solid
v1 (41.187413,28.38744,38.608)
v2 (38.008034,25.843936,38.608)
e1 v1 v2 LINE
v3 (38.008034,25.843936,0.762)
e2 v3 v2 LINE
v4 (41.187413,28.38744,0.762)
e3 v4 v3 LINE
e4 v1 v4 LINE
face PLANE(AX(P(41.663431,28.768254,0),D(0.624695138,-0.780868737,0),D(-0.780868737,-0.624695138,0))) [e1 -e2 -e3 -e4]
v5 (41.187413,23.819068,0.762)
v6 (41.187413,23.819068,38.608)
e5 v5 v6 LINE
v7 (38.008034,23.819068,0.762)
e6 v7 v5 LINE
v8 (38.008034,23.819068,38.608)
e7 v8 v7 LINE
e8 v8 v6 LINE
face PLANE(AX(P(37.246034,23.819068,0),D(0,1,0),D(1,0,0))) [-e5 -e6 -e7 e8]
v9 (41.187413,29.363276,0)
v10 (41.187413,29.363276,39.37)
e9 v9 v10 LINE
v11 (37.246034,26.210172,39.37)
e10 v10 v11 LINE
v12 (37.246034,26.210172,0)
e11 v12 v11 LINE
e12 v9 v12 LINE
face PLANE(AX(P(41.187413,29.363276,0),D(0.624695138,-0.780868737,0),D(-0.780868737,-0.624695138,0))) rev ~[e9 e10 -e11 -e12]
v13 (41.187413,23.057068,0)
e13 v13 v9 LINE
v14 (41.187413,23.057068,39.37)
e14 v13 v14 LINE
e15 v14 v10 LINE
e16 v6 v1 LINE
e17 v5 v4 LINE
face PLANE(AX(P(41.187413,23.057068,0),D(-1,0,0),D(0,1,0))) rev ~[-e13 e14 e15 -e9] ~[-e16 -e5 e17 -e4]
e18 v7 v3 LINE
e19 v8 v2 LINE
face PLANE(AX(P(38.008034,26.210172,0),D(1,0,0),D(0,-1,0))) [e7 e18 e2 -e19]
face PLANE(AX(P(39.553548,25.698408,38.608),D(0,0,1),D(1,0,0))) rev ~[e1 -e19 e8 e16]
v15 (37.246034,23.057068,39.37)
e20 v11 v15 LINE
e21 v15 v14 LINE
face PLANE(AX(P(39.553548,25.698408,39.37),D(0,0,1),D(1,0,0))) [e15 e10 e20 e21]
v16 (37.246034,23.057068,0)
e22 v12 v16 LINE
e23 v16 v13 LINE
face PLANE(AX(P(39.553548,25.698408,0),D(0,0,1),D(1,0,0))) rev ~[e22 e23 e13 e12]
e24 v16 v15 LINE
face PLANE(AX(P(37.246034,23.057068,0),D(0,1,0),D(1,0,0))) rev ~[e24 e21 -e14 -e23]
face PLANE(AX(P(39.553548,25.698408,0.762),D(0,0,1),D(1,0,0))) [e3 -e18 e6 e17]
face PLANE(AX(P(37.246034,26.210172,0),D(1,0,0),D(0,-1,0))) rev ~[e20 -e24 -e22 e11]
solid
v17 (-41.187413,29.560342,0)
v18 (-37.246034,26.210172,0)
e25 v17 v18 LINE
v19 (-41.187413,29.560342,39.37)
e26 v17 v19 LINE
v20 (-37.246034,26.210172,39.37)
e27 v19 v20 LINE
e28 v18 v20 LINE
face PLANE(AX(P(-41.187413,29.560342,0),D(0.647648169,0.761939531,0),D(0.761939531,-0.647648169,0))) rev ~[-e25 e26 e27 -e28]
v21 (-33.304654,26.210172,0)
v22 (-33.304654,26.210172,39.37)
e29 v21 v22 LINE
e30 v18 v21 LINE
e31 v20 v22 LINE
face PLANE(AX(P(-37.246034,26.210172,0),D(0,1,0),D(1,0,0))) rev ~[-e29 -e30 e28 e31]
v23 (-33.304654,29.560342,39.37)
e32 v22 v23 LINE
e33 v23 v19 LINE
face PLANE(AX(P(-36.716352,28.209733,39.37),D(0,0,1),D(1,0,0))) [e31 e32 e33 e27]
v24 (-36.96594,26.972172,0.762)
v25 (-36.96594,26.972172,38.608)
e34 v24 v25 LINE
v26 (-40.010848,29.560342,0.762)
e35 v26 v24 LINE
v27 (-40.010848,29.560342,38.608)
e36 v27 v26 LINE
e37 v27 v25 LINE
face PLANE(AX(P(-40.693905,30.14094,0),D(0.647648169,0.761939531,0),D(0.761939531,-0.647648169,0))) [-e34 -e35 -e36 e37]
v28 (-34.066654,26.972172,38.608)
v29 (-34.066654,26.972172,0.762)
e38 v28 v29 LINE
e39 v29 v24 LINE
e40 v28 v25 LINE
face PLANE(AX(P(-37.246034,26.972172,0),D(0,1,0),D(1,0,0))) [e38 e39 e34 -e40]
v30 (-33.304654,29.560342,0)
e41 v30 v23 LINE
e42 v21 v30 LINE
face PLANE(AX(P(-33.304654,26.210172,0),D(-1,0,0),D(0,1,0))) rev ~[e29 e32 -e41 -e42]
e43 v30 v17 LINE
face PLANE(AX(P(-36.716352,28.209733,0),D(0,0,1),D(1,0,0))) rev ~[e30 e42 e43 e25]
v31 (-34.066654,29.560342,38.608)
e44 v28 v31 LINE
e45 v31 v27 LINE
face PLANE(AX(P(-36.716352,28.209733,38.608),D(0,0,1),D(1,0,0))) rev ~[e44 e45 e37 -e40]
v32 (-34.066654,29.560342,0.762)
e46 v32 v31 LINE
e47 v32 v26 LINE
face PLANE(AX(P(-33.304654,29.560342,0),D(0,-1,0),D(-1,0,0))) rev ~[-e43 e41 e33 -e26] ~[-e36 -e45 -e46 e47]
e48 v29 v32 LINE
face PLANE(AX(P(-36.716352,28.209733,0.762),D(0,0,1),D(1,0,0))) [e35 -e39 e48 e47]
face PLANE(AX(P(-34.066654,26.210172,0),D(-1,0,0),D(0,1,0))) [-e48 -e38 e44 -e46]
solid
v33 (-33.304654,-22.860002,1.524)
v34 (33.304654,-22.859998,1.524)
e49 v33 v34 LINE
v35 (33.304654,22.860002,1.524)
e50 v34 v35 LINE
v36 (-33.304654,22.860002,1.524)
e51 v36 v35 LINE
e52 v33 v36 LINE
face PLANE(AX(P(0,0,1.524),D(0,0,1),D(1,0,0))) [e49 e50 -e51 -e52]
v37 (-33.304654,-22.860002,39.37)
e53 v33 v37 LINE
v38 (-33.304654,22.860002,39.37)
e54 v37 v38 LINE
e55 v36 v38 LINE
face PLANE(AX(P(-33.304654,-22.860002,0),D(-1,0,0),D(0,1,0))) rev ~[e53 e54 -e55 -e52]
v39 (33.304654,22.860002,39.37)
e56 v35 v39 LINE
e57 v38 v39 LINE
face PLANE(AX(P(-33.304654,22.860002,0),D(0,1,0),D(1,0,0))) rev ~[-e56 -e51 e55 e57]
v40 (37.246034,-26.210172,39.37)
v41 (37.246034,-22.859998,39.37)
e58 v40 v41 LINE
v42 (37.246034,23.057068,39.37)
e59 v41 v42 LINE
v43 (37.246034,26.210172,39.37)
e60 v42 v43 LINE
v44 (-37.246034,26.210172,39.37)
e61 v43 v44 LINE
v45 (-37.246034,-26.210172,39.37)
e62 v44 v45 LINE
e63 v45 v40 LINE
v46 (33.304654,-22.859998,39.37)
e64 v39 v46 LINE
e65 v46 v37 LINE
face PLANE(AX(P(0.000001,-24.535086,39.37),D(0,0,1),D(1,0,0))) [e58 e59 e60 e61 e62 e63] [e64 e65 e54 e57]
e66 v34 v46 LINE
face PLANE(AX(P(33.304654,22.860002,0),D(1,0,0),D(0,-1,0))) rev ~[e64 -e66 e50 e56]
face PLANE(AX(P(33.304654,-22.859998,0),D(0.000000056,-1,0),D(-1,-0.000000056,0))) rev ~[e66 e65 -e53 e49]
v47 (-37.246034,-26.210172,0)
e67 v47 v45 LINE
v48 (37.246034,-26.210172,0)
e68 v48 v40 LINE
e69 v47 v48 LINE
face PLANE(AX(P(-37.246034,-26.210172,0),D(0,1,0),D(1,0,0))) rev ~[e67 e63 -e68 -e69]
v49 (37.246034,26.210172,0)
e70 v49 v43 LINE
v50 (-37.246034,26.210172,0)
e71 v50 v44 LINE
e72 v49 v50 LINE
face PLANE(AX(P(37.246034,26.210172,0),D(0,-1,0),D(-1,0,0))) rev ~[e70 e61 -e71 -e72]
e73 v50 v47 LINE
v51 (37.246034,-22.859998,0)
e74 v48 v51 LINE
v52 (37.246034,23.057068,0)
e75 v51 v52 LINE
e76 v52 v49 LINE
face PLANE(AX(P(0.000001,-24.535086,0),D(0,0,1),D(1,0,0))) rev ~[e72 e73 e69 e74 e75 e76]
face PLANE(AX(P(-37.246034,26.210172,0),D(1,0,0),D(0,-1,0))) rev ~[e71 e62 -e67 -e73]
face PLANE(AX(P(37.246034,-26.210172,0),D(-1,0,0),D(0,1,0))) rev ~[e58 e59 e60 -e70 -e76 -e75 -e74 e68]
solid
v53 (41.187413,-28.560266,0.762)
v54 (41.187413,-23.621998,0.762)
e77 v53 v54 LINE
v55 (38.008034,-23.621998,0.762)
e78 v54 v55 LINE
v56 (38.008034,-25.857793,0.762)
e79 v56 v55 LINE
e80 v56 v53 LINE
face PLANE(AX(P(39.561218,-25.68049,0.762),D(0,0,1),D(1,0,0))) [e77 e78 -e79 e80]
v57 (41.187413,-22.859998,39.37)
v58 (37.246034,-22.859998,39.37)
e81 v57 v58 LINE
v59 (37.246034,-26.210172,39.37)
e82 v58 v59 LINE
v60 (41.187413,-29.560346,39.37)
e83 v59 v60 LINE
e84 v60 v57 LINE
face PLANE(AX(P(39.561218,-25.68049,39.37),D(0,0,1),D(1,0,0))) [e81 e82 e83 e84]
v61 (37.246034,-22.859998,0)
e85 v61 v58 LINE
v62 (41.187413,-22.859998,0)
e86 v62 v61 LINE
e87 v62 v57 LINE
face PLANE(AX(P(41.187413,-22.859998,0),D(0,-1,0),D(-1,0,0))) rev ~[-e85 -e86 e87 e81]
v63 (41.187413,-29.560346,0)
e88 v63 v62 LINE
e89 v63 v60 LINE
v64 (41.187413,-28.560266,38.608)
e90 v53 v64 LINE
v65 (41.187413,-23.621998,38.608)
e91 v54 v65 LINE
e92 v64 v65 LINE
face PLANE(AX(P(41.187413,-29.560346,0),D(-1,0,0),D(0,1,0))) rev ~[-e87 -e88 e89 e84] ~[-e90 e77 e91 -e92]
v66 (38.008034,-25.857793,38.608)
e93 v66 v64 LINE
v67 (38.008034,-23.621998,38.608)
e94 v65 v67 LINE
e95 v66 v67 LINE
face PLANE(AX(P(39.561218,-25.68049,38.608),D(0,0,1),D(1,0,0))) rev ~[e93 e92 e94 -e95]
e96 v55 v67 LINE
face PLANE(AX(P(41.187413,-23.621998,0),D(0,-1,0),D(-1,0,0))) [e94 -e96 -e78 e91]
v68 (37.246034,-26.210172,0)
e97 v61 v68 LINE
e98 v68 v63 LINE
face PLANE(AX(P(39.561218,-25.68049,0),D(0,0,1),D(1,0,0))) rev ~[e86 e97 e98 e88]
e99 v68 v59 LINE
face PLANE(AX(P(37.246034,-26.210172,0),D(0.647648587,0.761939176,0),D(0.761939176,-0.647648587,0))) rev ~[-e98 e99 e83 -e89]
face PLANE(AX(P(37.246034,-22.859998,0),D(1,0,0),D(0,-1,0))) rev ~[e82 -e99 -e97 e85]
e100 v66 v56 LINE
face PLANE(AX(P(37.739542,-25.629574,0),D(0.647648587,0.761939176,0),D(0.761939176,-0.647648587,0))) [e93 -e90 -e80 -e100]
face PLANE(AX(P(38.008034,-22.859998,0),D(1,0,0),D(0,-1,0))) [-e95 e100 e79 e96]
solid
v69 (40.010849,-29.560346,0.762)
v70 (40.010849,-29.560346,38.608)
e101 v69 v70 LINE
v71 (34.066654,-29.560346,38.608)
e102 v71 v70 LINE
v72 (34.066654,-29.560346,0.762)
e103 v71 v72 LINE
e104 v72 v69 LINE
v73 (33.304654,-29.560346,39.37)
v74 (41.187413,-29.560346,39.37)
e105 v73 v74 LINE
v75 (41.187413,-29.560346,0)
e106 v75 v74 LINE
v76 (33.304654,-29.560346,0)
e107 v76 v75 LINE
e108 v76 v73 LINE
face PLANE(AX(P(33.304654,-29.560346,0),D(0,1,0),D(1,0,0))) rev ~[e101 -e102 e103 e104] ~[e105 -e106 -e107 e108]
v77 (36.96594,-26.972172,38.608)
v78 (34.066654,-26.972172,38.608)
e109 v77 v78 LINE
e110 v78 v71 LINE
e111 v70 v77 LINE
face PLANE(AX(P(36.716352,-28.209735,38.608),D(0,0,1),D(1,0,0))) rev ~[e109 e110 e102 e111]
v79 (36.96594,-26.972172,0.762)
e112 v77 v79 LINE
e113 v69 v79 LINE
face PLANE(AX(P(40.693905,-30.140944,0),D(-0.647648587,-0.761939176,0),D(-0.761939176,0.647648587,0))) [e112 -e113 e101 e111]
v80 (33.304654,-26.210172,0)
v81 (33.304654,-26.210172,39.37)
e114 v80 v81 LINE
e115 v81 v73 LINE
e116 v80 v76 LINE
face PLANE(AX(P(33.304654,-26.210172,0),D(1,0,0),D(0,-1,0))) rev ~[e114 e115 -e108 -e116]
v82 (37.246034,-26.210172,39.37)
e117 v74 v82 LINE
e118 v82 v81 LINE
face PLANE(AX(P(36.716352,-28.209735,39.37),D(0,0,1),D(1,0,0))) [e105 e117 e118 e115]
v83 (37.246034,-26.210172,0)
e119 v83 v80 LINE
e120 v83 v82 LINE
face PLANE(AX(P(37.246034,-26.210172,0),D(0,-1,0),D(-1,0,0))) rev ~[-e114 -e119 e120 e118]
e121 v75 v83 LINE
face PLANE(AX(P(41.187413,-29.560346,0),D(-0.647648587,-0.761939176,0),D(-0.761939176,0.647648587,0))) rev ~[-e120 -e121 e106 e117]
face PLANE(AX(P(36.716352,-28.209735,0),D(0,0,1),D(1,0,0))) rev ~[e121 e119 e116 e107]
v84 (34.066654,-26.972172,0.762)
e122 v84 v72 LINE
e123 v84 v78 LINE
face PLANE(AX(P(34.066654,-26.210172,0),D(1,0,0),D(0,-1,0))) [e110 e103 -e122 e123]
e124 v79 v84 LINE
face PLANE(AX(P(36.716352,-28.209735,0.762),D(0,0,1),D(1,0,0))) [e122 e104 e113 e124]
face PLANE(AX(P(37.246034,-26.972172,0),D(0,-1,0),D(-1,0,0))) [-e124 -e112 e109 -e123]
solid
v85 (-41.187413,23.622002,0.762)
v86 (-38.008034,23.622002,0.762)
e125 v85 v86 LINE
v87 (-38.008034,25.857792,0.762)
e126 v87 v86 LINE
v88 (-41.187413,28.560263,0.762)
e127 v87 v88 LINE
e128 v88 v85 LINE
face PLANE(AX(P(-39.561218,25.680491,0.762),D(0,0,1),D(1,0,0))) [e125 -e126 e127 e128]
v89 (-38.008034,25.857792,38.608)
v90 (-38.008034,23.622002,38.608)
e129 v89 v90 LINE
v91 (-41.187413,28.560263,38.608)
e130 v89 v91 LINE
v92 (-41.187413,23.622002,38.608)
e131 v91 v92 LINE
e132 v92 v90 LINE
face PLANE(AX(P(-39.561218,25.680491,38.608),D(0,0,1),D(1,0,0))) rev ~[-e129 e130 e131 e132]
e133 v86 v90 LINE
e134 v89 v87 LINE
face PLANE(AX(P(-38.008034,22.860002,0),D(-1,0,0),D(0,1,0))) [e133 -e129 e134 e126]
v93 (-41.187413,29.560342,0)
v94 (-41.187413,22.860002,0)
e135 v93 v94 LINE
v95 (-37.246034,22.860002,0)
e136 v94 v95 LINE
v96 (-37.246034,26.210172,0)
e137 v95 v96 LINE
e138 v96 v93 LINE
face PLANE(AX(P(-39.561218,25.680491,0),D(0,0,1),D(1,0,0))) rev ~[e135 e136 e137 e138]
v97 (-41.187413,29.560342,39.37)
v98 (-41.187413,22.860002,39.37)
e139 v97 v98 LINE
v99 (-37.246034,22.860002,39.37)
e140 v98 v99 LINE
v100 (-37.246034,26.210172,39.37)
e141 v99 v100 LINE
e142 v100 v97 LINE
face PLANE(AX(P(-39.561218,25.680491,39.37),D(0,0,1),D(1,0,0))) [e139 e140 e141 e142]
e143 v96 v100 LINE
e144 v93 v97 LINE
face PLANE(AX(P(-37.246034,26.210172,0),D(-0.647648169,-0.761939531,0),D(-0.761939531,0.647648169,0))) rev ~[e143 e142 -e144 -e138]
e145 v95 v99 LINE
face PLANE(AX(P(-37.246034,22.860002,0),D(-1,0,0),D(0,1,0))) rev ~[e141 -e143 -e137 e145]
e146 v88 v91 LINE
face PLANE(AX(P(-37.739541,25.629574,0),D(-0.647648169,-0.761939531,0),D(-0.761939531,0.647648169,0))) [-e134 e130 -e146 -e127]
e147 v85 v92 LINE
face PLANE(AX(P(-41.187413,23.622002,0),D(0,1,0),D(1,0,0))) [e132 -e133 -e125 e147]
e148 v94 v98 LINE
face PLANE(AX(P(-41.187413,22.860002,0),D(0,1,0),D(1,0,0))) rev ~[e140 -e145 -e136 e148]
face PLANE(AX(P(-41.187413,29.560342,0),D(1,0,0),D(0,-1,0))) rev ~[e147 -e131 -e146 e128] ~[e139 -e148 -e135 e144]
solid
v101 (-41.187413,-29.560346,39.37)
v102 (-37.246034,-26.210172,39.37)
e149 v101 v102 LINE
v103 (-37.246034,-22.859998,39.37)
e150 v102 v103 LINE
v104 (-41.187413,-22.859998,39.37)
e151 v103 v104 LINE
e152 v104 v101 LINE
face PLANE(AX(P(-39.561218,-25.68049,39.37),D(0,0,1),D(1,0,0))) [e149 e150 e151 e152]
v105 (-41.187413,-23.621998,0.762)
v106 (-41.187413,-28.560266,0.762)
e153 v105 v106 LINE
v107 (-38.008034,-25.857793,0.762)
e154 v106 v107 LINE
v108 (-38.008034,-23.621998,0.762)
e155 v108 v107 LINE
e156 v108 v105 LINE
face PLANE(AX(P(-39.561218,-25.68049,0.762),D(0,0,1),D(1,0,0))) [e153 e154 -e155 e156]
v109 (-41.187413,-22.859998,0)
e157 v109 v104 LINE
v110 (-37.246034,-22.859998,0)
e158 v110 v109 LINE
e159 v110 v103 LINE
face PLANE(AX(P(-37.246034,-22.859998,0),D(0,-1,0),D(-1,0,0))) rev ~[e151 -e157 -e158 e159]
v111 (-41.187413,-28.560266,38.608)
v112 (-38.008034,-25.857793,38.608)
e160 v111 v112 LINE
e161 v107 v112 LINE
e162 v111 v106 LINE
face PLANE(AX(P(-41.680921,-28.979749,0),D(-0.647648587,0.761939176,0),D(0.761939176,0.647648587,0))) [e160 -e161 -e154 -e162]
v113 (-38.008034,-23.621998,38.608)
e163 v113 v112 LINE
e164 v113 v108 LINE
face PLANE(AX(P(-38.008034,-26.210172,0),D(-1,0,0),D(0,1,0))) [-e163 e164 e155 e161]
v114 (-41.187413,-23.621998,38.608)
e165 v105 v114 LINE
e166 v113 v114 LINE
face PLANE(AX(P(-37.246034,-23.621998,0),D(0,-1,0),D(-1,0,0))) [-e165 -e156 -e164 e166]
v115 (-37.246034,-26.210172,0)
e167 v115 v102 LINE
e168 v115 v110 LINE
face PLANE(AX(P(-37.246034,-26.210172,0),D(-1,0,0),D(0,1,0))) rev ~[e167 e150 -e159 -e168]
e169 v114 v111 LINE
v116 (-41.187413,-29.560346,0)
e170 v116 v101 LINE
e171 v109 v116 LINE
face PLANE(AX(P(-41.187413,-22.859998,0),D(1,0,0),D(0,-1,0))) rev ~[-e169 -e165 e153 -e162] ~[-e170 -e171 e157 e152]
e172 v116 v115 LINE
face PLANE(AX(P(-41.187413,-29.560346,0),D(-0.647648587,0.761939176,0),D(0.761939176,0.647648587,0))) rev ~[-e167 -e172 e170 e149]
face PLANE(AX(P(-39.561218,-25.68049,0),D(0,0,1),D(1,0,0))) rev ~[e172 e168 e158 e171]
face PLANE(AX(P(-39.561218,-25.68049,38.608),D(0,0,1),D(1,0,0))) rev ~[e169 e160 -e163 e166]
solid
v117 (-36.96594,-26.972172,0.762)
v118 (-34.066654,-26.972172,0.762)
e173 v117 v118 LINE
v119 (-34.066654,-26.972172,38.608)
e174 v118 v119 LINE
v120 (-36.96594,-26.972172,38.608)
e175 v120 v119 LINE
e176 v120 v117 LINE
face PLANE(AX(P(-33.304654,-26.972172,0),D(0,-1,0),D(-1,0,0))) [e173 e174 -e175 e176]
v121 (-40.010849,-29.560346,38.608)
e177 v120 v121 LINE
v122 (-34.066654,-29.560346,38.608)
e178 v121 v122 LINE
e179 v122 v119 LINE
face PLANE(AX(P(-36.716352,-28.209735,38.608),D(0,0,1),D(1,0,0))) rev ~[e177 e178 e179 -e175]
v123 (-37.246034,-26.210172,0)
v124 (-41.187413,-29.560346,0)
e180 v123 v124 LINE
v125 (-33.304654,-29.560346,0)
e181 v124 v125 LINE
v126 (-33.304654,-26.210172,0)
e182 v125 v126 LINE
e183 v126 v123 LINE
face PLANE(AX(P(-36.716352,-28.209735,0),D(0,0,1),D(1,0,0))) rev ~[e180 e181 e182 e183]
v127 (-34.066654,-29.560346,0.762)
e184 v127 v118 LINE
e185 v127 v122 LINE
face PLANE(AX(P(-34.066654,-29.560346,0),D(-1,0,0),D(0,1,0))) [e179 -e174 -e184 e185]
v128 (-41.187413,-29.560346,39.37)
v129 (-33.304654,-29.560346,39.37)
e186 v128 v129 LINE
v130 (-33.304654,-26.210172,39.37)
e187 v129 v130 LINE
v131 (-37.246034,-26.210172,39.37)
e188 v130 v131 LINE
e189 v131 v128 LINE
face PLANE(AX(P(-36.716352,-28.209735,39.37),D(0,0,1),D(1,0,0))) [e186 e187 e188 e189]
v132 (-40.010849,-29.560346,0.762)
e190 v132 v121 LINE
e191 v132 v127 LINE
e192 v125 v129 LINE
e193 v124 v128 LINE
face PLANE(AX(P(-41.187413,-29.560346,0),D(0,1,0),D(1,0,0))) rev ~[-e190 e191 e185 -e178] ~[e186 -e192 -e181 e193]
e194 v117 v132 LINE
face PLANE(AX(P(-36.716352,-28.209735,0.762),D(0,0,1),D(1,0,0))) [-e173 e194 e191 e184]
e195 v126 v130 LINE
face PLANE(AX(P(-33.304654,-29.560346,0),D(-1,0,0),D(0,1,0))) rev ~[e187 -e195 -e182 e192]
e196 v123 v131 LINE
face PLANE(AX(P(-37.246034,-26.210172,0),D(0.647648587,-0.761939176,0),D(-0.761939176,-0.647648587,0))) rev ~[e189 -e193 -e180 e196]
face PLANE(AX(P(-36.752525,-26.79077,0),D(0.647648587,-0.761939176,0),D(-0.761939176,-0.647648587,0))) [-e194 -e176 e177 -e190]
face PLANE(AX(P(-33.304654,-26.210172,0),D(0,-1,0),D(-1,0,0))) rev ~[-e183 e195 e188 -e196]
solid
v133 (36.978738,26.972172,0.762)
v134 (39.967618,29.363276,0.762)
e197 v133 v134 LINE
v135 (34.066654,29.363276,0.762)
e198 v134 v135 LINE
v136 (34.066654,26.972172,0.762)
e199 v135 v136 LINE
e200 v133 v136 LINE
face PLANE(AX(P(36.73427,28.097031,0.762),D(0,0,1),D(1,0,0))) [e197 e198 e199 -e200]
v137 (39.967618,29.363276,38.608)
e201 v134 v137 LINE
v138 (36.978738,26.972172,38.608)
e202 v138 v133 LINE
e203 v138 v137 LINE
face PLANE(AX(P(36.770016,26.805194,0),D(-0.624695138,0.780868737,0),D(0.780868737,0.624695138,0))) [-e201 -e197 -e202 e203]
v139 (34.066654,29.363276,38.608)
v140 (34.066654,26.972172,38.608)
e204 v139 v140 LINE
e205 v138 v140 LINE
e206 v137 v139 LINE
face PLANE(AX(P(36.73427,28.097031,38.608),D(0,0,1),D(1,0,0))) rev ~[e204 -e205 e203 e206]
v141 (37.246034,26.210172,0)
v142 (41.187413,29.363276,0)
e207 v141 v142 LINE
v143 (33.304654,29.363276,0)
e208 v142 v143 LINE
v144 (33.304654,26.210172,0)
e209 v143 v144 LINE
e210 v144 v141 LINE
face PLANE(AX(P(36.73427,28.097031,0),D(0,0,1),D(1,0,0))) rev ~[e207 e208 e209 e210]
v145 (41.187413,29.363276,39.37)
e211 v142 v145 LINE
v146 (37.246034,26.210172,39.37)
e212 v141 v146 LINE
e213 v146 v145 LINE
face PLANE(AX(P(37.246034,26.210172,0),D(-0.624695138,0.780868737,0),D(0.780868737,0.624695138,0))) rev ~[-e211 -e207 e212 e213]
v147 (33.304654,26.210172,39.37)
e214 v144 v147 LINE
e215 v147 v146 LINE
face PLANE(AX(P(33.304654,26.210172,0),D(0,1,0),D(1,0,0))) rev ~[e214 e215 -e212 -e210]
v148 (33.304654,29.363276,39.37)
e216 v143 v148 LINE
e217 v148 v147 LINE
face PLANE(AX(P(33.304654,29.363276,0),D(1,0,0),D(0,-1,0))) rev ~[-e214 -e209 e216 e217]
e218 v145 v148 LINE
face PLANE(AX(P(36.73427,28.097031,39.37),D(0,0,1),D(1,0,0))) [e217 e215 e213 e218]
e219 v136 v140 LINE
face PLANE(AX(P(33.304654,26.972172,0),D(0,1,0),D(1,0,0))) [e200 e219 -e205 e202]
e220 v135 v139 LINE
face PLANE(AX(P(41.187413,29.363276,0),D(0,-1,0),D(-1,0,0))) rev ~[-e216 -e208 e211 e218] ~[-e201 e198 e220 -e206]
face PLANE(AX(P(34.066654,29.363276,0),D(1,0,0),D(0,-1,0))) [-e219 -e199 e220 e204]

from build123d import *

# Parameters (mm, degrees)
F0_W     = 66.6093081236
F0_H     = 45.7200035453
F1_DEPTH = 1.524
F0_W_2   = 3.9413794875
F0_H_2   = 45.71999982
F0_H_3   = 3.1531043351
F0_H_4   = 3.3501740545
F0_H_5   = 3.3501703292
F2_DEPTH = 39.37
F3_DEPTH = 39.37
F4_DEPTH = 39.37
F5_T     = -0.762
F5_2_T   = -0.762
F5_3_T   = -0.762
F5_4_T   = -0.762
F5_5_T   = -0.762
F5_6_T   = -0.762
F5_7_T   = -0.762
F5_8_T   = -0.762


# Not quite as in the source:
# - ends of sketch curves that miss each other by under 0.0002 mm in the source are joined


with BuildPart() as f1:
    # F0 (on Top) → F1 (new body)
    with BuildSketch(Plane.XY):
        Rectangle(F0_W, F0_H)
    extrude(amount=F1_DEPTH)

    # F0 (on Top) → F2 (join)
    with BuildSketch(Plane.XY):
        Polygon((33.3046540618, -26.2101721019), (33.3046540618, -22.8599980474), (-33.3046540618, -22.8600017726), (-33.3046540618, -26.2101721019), align=None)
        with Locations((-35.2753438056, 1.8626e-06)):
            Rectangle(F0_W_2, F0_H_2)
        with Locations((35.2753438056, 24.6336199343)):
            Rectangle(F0_W_2, F0_H_3)
        Polygon((33.3046540618, 22.8600017726), (33.3046540618, -22.8600017726), (37.2460335493, -22.8599980474), (37.2460335493, 23.0570677668), (33.3046540618, 23.0570677668), (33.3046540618, 26.2101721019), (-33.3046540618, 26.2101721019), (-33.3046540618, 22.8600017726), align=None)
        with Locations((35.2753438056, -24.5350850746)):
            Rectangle(F0_W_2, F0_H_4)
        with Locations((-35.2753438056, -24.5350850746)):
            Rectangle(F0_W_2, F0_H_4)
        with Locations((-35.2753438056, 24.5350869372)):
            Rectangle(F0_W_2, F0_H_5)
    extrude(amount=F2_DEPTH)


with BuildPart() as f3:
    # F0 (on Top) → F3 (new body)
    with BuildSketch(Plane.XY):
        Polygon((-41.1874130368, 22.8600017726), (-37.2460335493, 22.8600017726), (-37.2460335493, 26.2101721019), (-41.1874130368, 29.5603424311), align=None)
    extrude(amount=F3_DEPTH)

    # F5#8
    f5_8_openings = [f3.faces().sort_by_distance(p)[0] for p in [
        (-41.187413, 26.210172, 19.685),
    ]]
    offset(amount=F5_8_T, openings=f5_8_openings)


with BuildPart() as f3b:
    # F0 (on Top) → F3, piece 2 (new body)
    with BuildSketch(Plane.XY):
        Polygon((-33.3046540618, -29.5603461564), (-33.3046540618, -26.2101721019), (-37.2460335493, -26.2101721019), (-41.1874130368, -29.5603461564), align=None)
    extrude(amount=F3_DEPTH)

    # F5
    f5_openings = [f3b.faces().sort_by_distance(p)[0] for p in [
        (-37.246034, -29.560346, 19.685),
    ]]
    offset(amount=F5_T, openings=f5_openings)


with BuildPart() as f3c:
    # F0 (on Top) → F3, piece 3 (new body)
    with BuildSketch(Plane.XY):
        Polygon((41.1874130368, -22.8599980474), (37.2460335493, -22.8599980474), (37.2460335493, -26.2101721019), (41.1874130368, -29.5603461564), align=None)
    extrude(amount=F3_DEPTH)

    # F5#3
    f5_3_openings = [f3c.faces().sort_by_distance(p)[0] for p in [
        (41.187413, -26.210172, 19.685),
    ]]
    offset(amount=F5_3_T, openings=f5_3_openings)


with BuildPart() as f3d:
    # F0 (on Top) → F3, piece 4 (new body)
    with BuildSketch(Plane.XY):
        Polygon((37.2460335493, 26.2101721019), (37.2460335493, 23.0570677668), (41.1874130368, 23.0570677668), (41.1874130368, 29.3632764369), align=None)
    extrude(amount=F3_DEPTH)

    # F5#4
    f5_4_openings = [f3d.faces().sort_by_distance(p)[0] for p in [
        (41.187413, 26.210172, 19.685),
    ]]
    offset(amount=F5_4_T, openings=f5_4_openings)


with BuildPart() as f4:
    # F0 (on Top) → F4 (new body)
    with BuildSketch(Plane.XY):
        Polygon((-37.2460335493, 26.2101721019), (-33.3046540618, 26.2101721019), (-33.3046540618, 29.5603424311), (-41.1874130368, 29.5603424311), align=None)
    extrude(amount=F4_DEPTH)

    # F5#6
    f5_6_openings = [f4.faces().sort_by_distance(p)[0] for p in [
        (-37.246034, 29.560342, 19.685),
    ]]
    offset(amount=F5_6_T, openings=f5_6_openings)


with BuildPart() as f4b:
    # F0 (on Top) → F4, piece 2 (new body)
    with BuildSketch(Plane.XY):
        Polygon((-37.2460335493, -26.2101721019), (-37.2460335493, -22.8599980474), (-41.1874130368, -22.8599980474), (-41.1874130368, -29.5603461564), align=None)
    extrude(amount=F4_DEPTH)

    # F5#7
    f5_7_openings = [f4b.faces().sort_by_distance(p)[0] for p in [
        (-41.187413, -26.210172, 19.685),
    ]]
    offset(amount=F5_7_T, openings=f5_7_openings)


with BuildPart() as f4c:
    # F0 (on Top) → F4, piece 3 (new body)
    with BuildSketch(Plane.XY):
        Polygon((37.2460335493, -26.2101721019), (33.3046540618, -26.2101721019), (33.3046540618, -29.5603461564), (41.1874130368, -29.5603461564), align=None)
    extrude(amount=F4_DEPTH)

    # F5#2
    f5_2_openings = [f4c.faces().sort_by_distance(p)[0] for p in [
        (37.246034, -29.560346, 19.685),
    ]]
    offset(amount=F5_2_T, openings=f5_2_openings, kind=Kind.INTERSECTION)


with BuildPart() as f4d:
    # F0 (on Top) → F4, piece 4 (new body)
    with BuildSketch(Plane.XY):
        Polygon((33.3046540618, 26.2101721019), (37.2460335493, 26.2101721019), (41.1874130368, 29.3632764369), (33.3046540618, 29.3632764369), align=None)
    extrude(amount=F4_DEPTH)

    # F5#5
    f5_5_openings = [f4d.faces().sort_by_distance(p)[0] for p in [
        (37.246034, 29.363276, 19.685),
    ]]
    offset(amount=F5_5_T, openings=f5_5_openings)


solid = Compound([f1.part, f3.part, f3b.part, f3c.part, f3d.part, f4.part, f4b.part, f4c.part, f4d.part])
